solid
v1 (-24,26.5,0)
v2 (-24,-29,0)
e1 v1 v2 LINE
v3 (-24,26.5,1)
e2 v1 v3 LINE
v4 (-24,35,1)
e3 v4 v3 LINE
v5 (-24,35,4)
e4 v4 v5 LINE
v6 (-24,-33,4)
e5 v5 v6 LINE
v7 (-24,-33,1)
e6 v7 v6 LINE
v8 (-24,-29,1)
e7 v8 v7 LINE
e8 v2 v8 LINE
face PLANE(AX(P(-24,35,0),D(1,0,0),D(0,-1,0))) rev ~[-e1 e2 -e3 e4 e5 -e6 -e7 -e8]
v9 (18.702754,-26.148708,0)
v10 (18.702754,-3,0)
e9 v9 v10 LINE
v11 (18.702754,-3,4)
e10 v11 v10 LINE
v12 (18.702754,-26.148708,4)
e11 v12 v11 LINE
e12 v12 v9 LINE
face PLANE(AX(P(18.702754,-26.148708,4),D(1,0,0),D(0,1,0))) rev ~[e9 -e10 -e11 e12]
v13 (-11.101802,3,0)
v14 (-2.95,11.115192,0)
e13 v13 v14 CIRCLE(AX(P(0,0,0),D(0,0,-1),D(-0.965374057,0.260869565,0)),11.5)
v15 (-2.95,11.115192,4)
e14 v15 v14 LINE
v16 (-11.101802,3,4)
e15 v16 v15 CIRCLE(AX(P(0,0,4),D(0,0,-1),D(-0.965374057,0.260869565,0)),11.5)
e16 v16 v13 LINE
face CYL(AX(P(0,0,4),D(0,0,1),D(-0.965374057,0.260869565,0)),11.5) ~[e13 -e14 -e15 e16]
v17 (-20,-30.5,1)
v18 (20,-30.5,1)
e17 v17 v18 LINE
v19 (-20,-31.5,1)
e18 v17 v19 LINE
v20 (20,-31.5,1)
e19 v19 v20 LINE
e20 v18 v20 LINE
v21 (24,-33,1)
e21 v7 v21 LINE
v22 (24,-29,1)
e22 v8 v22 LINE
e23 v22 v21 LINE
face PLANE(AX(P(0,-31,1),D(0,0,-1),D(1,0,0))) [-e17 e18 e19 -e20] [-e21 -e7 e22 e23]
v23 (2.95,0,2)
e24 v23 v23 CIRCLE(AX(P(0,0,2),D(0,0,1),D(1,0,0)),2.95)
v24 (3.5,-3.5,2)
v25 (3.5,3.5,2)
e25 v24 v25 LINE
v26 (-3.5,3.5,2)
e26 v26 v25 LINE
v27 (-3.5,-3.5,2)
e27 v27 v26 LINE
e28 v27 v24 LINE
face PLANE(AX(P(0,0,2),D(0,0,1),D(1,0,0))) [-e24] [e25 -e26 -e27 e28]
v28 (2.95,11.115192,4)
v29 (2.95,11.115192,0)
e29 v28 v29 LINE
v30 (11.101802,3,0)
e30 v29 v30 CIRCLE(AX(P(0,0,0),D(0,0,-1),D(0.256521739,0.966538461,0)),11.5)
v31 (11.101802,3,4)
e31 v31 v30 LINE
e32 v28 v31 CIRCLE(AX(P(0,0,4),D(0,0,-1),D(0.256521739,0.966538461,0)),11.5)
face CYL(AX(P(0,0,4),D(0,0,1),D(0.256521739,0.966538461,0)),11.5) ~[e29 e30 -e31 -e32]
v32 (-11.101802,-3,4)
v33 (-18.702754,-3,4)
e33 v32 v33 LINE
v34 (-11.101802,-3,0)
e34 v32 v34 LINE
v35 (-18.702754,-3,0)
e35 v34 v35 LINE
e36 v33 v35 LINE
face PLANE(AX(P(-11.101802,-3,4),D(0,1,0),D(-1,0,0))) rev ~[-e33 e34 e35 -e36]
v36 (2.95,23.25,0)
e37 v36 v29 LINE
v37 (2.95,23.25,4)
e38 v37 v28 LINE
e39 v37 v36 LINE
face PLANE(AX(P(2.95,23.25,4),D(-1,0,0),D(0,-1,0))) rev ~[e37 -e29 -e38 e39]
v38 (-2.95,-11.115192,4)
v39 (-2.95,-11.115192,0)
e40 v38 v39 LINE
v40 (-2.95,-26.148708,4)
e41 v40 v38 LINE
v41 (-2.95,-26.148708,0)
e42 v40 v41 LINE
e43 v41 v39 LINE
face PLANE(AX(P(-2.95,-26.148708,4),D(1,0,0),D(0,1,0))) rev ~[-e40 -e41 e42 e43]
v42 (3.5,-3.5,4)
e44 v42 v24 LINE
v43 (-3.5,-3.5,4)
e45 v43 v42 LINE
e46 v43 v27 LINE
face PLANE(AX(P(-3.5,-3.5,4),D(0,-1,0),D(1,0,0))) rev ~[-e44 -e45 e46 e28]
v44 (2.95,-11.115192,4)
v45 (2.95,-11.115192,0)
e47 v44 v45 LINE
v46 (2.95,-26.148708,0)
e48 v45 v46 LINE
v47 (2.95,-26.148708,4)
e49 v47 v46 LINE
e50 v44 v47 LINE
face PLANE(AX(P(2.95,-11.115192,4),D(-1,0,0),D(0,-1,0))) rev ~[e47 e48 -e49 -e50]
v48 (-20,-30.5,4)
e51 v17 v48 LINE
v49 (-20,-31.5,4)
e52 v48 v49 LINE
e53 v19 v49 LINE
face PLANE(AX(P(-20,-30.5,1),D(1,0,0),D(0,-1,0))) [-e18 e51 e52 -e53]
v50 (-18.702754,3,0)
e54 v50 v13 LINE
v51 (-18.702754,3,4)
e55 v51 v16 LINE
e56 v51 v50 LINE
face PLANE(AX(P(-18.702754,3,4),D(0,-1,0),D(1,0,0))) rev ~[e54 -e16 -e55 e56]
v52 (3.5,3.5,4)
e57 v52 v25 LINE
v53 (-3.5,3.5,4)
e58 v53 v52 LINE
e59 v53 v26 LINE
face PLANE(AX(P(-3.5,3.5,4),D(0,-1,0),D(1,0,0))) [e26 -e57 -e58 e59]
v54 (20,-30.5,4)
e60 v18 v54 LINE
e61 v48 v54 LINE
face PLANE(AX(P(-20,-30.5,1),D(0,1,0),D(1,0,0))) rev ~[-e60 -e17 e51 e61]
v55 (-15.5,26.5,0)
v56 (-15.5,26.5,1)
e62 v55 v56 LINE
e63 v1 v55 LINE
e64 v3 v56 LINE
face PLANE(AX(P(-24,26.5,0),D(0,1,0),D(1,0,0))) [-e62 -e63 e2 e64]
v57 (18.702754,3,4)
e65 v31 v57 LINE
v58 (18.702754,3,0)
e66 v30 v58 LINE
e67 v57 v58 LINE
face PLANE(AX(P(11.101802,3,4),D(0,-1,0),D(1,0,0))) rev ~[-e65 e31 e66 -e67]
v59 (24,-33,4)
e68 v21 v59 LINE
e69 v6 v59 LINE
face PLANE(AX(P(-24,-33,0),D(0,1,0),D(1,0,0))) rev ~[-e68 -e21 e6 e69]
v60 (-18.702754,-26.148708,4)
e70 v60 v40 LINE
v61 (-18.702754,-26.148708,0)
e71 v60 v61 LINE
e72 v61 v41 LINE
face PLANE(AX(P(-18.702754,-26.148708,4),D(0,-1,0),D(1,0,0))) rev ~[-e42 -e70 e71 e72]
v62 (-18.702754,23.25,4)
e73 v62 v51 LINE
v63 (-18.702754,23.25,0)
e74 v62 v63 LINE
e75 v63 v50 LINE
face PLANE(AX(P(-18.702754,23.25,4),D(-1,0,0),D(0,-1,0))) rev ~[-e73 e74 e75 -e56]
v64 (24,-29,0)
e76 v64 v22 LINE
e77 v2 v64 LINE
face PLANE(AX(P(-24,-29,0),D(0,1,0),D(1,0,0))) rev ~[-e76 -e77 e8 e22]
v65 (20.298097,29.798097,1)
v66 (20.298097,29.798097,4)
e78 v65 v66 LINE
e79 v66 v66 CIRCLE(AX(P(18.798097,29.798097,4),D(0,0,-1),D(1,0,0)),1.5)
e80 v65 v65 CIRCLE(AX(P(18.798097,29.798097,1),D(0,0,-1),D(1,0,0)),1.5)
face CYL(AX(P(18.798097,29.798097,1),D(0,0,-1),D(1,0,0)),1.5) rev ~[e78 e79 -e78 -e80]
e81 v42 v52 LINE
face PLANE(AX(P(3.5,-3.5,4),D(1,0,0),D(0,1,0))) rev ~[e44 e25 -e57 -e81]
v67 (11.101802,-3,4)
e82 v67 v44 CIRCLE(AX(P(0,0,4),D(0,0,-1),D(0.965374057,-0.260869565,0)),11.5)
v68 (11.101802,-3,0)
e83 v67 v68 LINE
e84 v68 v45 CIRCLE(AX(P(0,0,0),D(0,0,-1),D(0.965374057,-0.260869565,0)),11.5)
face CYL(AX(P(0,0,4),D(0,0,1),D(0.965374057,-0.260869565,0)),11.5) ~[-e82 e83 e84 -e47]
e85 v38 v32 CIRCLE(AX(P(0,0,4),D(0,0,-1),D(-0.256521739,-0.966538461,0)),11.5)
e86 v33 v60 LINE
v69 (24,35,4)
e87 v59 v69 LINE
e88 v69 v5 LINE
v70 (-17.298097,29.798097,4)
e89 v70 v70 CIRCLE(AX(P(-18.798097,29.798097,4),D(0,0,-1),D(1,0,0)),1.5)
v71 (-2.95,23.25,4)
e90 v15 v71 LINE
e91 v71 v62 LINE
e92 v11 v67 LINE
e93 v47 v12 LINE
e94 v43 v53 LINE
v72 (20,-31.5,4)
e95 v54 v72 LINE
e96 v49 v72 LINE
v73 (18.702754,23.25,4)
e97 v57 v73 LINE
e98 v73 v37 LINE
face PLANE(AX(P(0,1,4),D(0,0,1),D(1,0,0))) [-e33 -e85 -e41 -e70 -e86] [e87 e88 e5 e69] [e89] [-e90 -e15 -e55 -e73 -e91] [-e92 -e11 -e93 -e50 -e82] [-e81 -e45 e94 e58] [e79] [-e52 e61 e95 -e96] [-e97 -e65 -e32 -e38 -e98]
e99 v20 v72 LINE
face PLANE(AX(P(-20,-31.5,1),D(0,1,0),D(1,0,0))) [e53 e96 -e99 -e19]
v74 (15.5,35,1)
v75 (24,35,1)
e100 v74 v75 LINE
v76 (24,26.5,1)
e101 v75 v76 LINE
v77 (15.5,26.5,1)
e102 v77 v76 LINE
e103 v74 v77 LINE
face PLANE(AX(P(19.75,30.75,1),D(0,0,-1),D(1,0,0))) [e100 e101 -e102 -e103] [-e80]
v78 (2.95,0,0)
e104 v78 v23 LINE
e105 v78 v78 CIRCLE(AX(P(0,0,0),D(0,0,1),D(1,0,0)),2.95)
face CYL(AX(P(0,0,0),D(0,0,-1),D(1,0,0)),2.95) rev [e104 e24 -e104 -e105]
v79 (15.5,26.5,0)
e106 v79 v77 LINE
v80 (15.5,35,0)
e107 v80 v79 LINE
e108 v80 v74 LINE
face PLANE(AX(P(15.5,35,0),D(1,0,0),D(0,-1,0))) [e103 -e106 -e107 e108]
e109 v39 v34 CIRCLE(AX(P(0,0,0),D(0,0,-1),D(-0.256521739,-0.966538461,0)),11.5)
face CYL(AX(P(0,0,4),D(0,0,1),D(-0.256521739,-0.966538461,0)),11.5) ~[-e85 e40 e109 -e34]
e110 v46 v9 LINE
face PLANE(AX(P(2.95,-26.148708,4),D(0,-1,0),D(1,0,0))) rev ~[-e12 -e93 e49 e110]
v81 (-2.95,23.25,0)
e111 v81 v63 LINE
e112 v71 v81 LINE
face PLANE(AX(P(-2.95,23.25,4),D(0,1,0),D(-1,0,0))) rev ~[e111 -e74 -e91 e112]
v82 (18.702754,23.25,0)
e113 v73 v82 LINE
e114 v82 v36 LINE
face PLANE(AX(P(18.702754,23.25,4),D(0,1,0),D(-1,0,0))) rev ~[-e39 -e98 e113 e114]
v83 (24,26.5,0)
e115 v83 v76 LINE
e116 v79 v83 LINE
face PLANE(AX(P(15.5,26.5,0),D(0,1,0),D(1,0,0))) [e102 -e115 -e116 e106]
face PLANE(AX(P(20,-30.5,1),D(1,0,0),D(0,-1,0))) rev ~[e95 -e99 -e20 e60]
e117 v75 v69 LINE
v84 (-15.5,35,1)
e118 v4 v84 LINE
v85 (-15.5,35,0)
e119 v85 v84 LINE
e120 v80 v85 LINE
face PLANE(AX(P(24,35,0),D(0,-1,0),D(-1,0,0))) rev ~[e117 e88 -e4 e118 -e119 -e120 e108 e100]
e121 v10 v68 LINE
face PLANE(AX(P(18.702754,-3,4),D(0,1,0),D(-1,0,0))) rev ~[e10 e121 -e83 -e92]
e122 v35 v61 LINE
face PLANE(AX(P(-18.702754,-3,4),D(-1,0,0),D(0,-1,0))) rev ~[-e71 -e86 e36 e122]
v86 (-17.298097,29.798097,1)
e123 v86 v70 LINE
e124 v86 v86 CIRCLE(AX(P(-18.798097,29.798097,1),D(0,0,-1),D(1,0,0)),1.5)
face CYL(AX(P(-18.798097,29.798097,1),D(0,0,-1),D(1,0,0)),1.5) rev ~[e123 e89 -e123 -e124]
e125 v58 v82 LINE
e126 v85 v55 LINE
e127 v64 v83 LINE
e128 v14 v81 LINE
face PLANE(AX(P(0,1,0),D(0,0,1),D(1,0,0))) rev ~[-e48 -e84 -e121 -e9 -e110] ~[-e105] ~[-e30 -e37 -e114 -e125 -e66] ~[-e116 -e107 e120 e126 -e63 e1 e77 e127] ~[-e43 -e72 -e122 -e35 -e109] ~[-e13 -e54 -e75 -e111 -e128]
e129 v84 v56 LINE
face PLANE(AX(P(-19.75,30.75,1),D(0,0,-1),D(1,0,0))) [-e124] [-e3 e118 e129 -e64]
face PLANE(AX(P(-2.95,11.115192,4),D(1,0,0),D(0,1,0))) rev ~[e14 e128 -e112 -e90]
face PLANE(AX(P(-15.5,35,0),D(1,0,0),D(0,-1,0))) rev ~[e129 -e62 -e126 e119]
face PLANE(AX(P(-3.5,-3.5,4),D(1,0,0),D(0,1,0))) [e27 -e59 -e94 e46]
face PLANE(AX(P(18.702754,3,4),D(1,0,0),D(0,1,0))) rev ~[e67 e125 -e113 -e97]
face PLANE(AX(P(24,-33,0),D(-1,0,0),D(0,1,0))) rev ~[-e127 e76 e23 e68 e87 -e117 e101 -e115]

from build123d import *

# Parameters (mm, degrees)
F0_R      = 2.95
F1_DEPTH  = 4
F2_W      = 8.5
F2_H      = 8.5
F3_DEPTH  = 1
F4_R      = 1.5
F5_DEPTH  = 3
F7_DEPTH  = 4
F8_R      = 1.5
F9_DEPTH  = 3
F10_W     = 48
F10_H     = 4
F11_DEPTH = 1
F12_W     = 40
F12_H     = 1
F13_DEPTH = 3
F14_W     = 7
F14_H     = 7
F14_R     = 2.95
F15_DEPTH = 2


# Not quite as in the source:
# - a feature names something its author has since deleted; it is built from what else it names


with BuildPart() as f1:
    # F0 (on Top) → F1 (new body)
    with BuildSketch(Plane.XY):
        Polygon((-24, -33), (24, -33), (24, 26.5), (24, 35), (17.5, 35), (-17.5, 35), (-24, 35), (-24, 26.5), align=None)
        Circle(F0_R, mode=Mode.SUBTRACT)
    extrude(amount=F1_DEPTH)

    # F2 (on face) → F3 (cut)
    with BuildSketch(Plane(origin=(0, 0, 0), x_dir=(1, 0, 0), z_dir=(0, 0, -1))):
        with Locations((19.75, -30.75)):
            Rectangle(F2_W, F2_H)
        with Locations((-19.75, -30.75)):
            Rectangle(F2_W, F2_H)
    extrude(amount=-F3_DEPTH, mode=Mode.SUBTRACT)

    # F4 (on face) → F5 (cut)
    with BuildSketch(Plane(origin=(0, 0, 1), x_dir=(1, 0, 0), z_dir=(0, 0, -1))):
        with Locations((18.7980970389, -29.7980970389)):
            Circle(F4_R)
    extrude(amount=-F5_DEPTH, mode=Mode.SUBTRACT)

    # F6 (on face) → F7 (cut)
    with BuildSketch(Plane.XY.offset(4)):
        with BuildLine():
            Line((-18.7027541446, 3), (-11.1018016556, 3))
            ThreePointArc((-11.1018016556, 3), (-8.1134067433, 8.1500080379), (-2.95, 11.115192306))
            Line((-2.95, 11.115192306), (-2.95, 23.25))
            Line((-2.95, 23.25), (-18.7027541446, 23.25))
            Line((-18.7027541446, 23.25), (-18.7027541446, 3))
        make_face()
        with BuildLine():
            Line((2.95, 23.25), (2.95, 11.115192306))
            ThreePointArc((2.95, 11.115192306), (8.1134067433, 8.1500080379), (11.1018016556, 3))
            Line((11.1018016556, 3), (18.7027541446, 3))
            Line((18.7027541446, 3), (18.7027541446, 23.25))
            Line((18.7027541446, 23.25), (2.95, 23.25))
        make_face()
        with BuildLine():
            Line((-18.7027541446, -9.125), (-18.7027541446, -16.125))
            Line((-18.7027541446, -16.125), (-18.7027541446, -26.1487078986))
            Line((-18.7027541446, -26.1487078986), (-10, -26.1487078986))
            Line((-10, -26.1487078986), (-2.95, -26.1487078986))
            Line((-2.95, -26.1487078986), (-2.95, -11.115192306))
            ThreePointArc((-2.95, -11.115192306), (-8.1134067433, -8.1500080379), (-11.1018016556, -3))
            Line((-11.1018016556, -3), (-17.7254807204, -3))
            Line((-17.7254807204, -3), (-18.7027541446, -3))
            Line((-18.7027541446, -3), (-18.7027541446, -9.125))
        make_face()
        with BuildLine():
            ThreePointArc((11.1018016556, -3), (8.1134067433, -8.1500080379), (2.95, -11.115192306))
            Line((2.95, -11.115192306), (2.95, -26.1487078986))
            Line((2.95, -26.1487078986), (10, -26.1487078986))
            Line((10, -26.1487078986), (18.7027541446, -26.1487078986))
            Line((18.7027541446, -26.1487078986), (18.7027541446, -16.125))
            Line((18.7027541446, -16.125), (18.7027541446, -9.125))
            Line((18.7027541446, -9.125), (18.7027541446, -3.9093415253))
            Line((18.7027541446, -3.9093415253), (18.7027541446, -3))
            Line((18.7027541446, -3), (11.1018016556, -3))
        make_face()
    extrude(amount=-F7_DEPTH, mode=Mode.SUBTRACT)

    # F8 (on face) → F9 (cut)
    with BuildSketch(Plane(origin=(0, 0, 1), x_dir=(1, 0, 0), z_dir=(0, 0, -1))):
        with Locations((-18.7980970389, -29.7980970389)):
            Circle(F8_R)
    extrude(amount=-F9_DEPTH, mode=Mode.SUBTRACT)

    # F10 (on face) → F11 (cut)
    with BuildSketch(Plane(origin=(0, 0, 0), x_dir=(1, 0, 0), z_dir=(0, 0, -1))):
        with Locations((0, 31)):
            Rectangle(F10_W, F10_H)
    extrude(amount=-F11_DEPTH, mode=Mode.SUBTRACT)

    # F12 (on face) → F13 (cut)
    with BuildSketch(Plane(origin=(0, 0, 1), x_dir=(1, 0, 0), z_dir=(0, 0, -1))):
        with Locations((0, 31)):
            Rectangle(F12_W, F12_H)
    extrude(amount=-F13_DEPTH, mode=Mode.SUBTRACT)

    # F14 (on face) → F15 (cut)
    with BuildSketch(Plane.XY.offset(4)):
        Rectangle(F14_W, F14_H)
        Circle(F14_R, mode=Mode.SUBTRACT)
    extrude(amount=-F15_DEPTH, mode=Mode.SUBTRACT)


solid = f1.part
